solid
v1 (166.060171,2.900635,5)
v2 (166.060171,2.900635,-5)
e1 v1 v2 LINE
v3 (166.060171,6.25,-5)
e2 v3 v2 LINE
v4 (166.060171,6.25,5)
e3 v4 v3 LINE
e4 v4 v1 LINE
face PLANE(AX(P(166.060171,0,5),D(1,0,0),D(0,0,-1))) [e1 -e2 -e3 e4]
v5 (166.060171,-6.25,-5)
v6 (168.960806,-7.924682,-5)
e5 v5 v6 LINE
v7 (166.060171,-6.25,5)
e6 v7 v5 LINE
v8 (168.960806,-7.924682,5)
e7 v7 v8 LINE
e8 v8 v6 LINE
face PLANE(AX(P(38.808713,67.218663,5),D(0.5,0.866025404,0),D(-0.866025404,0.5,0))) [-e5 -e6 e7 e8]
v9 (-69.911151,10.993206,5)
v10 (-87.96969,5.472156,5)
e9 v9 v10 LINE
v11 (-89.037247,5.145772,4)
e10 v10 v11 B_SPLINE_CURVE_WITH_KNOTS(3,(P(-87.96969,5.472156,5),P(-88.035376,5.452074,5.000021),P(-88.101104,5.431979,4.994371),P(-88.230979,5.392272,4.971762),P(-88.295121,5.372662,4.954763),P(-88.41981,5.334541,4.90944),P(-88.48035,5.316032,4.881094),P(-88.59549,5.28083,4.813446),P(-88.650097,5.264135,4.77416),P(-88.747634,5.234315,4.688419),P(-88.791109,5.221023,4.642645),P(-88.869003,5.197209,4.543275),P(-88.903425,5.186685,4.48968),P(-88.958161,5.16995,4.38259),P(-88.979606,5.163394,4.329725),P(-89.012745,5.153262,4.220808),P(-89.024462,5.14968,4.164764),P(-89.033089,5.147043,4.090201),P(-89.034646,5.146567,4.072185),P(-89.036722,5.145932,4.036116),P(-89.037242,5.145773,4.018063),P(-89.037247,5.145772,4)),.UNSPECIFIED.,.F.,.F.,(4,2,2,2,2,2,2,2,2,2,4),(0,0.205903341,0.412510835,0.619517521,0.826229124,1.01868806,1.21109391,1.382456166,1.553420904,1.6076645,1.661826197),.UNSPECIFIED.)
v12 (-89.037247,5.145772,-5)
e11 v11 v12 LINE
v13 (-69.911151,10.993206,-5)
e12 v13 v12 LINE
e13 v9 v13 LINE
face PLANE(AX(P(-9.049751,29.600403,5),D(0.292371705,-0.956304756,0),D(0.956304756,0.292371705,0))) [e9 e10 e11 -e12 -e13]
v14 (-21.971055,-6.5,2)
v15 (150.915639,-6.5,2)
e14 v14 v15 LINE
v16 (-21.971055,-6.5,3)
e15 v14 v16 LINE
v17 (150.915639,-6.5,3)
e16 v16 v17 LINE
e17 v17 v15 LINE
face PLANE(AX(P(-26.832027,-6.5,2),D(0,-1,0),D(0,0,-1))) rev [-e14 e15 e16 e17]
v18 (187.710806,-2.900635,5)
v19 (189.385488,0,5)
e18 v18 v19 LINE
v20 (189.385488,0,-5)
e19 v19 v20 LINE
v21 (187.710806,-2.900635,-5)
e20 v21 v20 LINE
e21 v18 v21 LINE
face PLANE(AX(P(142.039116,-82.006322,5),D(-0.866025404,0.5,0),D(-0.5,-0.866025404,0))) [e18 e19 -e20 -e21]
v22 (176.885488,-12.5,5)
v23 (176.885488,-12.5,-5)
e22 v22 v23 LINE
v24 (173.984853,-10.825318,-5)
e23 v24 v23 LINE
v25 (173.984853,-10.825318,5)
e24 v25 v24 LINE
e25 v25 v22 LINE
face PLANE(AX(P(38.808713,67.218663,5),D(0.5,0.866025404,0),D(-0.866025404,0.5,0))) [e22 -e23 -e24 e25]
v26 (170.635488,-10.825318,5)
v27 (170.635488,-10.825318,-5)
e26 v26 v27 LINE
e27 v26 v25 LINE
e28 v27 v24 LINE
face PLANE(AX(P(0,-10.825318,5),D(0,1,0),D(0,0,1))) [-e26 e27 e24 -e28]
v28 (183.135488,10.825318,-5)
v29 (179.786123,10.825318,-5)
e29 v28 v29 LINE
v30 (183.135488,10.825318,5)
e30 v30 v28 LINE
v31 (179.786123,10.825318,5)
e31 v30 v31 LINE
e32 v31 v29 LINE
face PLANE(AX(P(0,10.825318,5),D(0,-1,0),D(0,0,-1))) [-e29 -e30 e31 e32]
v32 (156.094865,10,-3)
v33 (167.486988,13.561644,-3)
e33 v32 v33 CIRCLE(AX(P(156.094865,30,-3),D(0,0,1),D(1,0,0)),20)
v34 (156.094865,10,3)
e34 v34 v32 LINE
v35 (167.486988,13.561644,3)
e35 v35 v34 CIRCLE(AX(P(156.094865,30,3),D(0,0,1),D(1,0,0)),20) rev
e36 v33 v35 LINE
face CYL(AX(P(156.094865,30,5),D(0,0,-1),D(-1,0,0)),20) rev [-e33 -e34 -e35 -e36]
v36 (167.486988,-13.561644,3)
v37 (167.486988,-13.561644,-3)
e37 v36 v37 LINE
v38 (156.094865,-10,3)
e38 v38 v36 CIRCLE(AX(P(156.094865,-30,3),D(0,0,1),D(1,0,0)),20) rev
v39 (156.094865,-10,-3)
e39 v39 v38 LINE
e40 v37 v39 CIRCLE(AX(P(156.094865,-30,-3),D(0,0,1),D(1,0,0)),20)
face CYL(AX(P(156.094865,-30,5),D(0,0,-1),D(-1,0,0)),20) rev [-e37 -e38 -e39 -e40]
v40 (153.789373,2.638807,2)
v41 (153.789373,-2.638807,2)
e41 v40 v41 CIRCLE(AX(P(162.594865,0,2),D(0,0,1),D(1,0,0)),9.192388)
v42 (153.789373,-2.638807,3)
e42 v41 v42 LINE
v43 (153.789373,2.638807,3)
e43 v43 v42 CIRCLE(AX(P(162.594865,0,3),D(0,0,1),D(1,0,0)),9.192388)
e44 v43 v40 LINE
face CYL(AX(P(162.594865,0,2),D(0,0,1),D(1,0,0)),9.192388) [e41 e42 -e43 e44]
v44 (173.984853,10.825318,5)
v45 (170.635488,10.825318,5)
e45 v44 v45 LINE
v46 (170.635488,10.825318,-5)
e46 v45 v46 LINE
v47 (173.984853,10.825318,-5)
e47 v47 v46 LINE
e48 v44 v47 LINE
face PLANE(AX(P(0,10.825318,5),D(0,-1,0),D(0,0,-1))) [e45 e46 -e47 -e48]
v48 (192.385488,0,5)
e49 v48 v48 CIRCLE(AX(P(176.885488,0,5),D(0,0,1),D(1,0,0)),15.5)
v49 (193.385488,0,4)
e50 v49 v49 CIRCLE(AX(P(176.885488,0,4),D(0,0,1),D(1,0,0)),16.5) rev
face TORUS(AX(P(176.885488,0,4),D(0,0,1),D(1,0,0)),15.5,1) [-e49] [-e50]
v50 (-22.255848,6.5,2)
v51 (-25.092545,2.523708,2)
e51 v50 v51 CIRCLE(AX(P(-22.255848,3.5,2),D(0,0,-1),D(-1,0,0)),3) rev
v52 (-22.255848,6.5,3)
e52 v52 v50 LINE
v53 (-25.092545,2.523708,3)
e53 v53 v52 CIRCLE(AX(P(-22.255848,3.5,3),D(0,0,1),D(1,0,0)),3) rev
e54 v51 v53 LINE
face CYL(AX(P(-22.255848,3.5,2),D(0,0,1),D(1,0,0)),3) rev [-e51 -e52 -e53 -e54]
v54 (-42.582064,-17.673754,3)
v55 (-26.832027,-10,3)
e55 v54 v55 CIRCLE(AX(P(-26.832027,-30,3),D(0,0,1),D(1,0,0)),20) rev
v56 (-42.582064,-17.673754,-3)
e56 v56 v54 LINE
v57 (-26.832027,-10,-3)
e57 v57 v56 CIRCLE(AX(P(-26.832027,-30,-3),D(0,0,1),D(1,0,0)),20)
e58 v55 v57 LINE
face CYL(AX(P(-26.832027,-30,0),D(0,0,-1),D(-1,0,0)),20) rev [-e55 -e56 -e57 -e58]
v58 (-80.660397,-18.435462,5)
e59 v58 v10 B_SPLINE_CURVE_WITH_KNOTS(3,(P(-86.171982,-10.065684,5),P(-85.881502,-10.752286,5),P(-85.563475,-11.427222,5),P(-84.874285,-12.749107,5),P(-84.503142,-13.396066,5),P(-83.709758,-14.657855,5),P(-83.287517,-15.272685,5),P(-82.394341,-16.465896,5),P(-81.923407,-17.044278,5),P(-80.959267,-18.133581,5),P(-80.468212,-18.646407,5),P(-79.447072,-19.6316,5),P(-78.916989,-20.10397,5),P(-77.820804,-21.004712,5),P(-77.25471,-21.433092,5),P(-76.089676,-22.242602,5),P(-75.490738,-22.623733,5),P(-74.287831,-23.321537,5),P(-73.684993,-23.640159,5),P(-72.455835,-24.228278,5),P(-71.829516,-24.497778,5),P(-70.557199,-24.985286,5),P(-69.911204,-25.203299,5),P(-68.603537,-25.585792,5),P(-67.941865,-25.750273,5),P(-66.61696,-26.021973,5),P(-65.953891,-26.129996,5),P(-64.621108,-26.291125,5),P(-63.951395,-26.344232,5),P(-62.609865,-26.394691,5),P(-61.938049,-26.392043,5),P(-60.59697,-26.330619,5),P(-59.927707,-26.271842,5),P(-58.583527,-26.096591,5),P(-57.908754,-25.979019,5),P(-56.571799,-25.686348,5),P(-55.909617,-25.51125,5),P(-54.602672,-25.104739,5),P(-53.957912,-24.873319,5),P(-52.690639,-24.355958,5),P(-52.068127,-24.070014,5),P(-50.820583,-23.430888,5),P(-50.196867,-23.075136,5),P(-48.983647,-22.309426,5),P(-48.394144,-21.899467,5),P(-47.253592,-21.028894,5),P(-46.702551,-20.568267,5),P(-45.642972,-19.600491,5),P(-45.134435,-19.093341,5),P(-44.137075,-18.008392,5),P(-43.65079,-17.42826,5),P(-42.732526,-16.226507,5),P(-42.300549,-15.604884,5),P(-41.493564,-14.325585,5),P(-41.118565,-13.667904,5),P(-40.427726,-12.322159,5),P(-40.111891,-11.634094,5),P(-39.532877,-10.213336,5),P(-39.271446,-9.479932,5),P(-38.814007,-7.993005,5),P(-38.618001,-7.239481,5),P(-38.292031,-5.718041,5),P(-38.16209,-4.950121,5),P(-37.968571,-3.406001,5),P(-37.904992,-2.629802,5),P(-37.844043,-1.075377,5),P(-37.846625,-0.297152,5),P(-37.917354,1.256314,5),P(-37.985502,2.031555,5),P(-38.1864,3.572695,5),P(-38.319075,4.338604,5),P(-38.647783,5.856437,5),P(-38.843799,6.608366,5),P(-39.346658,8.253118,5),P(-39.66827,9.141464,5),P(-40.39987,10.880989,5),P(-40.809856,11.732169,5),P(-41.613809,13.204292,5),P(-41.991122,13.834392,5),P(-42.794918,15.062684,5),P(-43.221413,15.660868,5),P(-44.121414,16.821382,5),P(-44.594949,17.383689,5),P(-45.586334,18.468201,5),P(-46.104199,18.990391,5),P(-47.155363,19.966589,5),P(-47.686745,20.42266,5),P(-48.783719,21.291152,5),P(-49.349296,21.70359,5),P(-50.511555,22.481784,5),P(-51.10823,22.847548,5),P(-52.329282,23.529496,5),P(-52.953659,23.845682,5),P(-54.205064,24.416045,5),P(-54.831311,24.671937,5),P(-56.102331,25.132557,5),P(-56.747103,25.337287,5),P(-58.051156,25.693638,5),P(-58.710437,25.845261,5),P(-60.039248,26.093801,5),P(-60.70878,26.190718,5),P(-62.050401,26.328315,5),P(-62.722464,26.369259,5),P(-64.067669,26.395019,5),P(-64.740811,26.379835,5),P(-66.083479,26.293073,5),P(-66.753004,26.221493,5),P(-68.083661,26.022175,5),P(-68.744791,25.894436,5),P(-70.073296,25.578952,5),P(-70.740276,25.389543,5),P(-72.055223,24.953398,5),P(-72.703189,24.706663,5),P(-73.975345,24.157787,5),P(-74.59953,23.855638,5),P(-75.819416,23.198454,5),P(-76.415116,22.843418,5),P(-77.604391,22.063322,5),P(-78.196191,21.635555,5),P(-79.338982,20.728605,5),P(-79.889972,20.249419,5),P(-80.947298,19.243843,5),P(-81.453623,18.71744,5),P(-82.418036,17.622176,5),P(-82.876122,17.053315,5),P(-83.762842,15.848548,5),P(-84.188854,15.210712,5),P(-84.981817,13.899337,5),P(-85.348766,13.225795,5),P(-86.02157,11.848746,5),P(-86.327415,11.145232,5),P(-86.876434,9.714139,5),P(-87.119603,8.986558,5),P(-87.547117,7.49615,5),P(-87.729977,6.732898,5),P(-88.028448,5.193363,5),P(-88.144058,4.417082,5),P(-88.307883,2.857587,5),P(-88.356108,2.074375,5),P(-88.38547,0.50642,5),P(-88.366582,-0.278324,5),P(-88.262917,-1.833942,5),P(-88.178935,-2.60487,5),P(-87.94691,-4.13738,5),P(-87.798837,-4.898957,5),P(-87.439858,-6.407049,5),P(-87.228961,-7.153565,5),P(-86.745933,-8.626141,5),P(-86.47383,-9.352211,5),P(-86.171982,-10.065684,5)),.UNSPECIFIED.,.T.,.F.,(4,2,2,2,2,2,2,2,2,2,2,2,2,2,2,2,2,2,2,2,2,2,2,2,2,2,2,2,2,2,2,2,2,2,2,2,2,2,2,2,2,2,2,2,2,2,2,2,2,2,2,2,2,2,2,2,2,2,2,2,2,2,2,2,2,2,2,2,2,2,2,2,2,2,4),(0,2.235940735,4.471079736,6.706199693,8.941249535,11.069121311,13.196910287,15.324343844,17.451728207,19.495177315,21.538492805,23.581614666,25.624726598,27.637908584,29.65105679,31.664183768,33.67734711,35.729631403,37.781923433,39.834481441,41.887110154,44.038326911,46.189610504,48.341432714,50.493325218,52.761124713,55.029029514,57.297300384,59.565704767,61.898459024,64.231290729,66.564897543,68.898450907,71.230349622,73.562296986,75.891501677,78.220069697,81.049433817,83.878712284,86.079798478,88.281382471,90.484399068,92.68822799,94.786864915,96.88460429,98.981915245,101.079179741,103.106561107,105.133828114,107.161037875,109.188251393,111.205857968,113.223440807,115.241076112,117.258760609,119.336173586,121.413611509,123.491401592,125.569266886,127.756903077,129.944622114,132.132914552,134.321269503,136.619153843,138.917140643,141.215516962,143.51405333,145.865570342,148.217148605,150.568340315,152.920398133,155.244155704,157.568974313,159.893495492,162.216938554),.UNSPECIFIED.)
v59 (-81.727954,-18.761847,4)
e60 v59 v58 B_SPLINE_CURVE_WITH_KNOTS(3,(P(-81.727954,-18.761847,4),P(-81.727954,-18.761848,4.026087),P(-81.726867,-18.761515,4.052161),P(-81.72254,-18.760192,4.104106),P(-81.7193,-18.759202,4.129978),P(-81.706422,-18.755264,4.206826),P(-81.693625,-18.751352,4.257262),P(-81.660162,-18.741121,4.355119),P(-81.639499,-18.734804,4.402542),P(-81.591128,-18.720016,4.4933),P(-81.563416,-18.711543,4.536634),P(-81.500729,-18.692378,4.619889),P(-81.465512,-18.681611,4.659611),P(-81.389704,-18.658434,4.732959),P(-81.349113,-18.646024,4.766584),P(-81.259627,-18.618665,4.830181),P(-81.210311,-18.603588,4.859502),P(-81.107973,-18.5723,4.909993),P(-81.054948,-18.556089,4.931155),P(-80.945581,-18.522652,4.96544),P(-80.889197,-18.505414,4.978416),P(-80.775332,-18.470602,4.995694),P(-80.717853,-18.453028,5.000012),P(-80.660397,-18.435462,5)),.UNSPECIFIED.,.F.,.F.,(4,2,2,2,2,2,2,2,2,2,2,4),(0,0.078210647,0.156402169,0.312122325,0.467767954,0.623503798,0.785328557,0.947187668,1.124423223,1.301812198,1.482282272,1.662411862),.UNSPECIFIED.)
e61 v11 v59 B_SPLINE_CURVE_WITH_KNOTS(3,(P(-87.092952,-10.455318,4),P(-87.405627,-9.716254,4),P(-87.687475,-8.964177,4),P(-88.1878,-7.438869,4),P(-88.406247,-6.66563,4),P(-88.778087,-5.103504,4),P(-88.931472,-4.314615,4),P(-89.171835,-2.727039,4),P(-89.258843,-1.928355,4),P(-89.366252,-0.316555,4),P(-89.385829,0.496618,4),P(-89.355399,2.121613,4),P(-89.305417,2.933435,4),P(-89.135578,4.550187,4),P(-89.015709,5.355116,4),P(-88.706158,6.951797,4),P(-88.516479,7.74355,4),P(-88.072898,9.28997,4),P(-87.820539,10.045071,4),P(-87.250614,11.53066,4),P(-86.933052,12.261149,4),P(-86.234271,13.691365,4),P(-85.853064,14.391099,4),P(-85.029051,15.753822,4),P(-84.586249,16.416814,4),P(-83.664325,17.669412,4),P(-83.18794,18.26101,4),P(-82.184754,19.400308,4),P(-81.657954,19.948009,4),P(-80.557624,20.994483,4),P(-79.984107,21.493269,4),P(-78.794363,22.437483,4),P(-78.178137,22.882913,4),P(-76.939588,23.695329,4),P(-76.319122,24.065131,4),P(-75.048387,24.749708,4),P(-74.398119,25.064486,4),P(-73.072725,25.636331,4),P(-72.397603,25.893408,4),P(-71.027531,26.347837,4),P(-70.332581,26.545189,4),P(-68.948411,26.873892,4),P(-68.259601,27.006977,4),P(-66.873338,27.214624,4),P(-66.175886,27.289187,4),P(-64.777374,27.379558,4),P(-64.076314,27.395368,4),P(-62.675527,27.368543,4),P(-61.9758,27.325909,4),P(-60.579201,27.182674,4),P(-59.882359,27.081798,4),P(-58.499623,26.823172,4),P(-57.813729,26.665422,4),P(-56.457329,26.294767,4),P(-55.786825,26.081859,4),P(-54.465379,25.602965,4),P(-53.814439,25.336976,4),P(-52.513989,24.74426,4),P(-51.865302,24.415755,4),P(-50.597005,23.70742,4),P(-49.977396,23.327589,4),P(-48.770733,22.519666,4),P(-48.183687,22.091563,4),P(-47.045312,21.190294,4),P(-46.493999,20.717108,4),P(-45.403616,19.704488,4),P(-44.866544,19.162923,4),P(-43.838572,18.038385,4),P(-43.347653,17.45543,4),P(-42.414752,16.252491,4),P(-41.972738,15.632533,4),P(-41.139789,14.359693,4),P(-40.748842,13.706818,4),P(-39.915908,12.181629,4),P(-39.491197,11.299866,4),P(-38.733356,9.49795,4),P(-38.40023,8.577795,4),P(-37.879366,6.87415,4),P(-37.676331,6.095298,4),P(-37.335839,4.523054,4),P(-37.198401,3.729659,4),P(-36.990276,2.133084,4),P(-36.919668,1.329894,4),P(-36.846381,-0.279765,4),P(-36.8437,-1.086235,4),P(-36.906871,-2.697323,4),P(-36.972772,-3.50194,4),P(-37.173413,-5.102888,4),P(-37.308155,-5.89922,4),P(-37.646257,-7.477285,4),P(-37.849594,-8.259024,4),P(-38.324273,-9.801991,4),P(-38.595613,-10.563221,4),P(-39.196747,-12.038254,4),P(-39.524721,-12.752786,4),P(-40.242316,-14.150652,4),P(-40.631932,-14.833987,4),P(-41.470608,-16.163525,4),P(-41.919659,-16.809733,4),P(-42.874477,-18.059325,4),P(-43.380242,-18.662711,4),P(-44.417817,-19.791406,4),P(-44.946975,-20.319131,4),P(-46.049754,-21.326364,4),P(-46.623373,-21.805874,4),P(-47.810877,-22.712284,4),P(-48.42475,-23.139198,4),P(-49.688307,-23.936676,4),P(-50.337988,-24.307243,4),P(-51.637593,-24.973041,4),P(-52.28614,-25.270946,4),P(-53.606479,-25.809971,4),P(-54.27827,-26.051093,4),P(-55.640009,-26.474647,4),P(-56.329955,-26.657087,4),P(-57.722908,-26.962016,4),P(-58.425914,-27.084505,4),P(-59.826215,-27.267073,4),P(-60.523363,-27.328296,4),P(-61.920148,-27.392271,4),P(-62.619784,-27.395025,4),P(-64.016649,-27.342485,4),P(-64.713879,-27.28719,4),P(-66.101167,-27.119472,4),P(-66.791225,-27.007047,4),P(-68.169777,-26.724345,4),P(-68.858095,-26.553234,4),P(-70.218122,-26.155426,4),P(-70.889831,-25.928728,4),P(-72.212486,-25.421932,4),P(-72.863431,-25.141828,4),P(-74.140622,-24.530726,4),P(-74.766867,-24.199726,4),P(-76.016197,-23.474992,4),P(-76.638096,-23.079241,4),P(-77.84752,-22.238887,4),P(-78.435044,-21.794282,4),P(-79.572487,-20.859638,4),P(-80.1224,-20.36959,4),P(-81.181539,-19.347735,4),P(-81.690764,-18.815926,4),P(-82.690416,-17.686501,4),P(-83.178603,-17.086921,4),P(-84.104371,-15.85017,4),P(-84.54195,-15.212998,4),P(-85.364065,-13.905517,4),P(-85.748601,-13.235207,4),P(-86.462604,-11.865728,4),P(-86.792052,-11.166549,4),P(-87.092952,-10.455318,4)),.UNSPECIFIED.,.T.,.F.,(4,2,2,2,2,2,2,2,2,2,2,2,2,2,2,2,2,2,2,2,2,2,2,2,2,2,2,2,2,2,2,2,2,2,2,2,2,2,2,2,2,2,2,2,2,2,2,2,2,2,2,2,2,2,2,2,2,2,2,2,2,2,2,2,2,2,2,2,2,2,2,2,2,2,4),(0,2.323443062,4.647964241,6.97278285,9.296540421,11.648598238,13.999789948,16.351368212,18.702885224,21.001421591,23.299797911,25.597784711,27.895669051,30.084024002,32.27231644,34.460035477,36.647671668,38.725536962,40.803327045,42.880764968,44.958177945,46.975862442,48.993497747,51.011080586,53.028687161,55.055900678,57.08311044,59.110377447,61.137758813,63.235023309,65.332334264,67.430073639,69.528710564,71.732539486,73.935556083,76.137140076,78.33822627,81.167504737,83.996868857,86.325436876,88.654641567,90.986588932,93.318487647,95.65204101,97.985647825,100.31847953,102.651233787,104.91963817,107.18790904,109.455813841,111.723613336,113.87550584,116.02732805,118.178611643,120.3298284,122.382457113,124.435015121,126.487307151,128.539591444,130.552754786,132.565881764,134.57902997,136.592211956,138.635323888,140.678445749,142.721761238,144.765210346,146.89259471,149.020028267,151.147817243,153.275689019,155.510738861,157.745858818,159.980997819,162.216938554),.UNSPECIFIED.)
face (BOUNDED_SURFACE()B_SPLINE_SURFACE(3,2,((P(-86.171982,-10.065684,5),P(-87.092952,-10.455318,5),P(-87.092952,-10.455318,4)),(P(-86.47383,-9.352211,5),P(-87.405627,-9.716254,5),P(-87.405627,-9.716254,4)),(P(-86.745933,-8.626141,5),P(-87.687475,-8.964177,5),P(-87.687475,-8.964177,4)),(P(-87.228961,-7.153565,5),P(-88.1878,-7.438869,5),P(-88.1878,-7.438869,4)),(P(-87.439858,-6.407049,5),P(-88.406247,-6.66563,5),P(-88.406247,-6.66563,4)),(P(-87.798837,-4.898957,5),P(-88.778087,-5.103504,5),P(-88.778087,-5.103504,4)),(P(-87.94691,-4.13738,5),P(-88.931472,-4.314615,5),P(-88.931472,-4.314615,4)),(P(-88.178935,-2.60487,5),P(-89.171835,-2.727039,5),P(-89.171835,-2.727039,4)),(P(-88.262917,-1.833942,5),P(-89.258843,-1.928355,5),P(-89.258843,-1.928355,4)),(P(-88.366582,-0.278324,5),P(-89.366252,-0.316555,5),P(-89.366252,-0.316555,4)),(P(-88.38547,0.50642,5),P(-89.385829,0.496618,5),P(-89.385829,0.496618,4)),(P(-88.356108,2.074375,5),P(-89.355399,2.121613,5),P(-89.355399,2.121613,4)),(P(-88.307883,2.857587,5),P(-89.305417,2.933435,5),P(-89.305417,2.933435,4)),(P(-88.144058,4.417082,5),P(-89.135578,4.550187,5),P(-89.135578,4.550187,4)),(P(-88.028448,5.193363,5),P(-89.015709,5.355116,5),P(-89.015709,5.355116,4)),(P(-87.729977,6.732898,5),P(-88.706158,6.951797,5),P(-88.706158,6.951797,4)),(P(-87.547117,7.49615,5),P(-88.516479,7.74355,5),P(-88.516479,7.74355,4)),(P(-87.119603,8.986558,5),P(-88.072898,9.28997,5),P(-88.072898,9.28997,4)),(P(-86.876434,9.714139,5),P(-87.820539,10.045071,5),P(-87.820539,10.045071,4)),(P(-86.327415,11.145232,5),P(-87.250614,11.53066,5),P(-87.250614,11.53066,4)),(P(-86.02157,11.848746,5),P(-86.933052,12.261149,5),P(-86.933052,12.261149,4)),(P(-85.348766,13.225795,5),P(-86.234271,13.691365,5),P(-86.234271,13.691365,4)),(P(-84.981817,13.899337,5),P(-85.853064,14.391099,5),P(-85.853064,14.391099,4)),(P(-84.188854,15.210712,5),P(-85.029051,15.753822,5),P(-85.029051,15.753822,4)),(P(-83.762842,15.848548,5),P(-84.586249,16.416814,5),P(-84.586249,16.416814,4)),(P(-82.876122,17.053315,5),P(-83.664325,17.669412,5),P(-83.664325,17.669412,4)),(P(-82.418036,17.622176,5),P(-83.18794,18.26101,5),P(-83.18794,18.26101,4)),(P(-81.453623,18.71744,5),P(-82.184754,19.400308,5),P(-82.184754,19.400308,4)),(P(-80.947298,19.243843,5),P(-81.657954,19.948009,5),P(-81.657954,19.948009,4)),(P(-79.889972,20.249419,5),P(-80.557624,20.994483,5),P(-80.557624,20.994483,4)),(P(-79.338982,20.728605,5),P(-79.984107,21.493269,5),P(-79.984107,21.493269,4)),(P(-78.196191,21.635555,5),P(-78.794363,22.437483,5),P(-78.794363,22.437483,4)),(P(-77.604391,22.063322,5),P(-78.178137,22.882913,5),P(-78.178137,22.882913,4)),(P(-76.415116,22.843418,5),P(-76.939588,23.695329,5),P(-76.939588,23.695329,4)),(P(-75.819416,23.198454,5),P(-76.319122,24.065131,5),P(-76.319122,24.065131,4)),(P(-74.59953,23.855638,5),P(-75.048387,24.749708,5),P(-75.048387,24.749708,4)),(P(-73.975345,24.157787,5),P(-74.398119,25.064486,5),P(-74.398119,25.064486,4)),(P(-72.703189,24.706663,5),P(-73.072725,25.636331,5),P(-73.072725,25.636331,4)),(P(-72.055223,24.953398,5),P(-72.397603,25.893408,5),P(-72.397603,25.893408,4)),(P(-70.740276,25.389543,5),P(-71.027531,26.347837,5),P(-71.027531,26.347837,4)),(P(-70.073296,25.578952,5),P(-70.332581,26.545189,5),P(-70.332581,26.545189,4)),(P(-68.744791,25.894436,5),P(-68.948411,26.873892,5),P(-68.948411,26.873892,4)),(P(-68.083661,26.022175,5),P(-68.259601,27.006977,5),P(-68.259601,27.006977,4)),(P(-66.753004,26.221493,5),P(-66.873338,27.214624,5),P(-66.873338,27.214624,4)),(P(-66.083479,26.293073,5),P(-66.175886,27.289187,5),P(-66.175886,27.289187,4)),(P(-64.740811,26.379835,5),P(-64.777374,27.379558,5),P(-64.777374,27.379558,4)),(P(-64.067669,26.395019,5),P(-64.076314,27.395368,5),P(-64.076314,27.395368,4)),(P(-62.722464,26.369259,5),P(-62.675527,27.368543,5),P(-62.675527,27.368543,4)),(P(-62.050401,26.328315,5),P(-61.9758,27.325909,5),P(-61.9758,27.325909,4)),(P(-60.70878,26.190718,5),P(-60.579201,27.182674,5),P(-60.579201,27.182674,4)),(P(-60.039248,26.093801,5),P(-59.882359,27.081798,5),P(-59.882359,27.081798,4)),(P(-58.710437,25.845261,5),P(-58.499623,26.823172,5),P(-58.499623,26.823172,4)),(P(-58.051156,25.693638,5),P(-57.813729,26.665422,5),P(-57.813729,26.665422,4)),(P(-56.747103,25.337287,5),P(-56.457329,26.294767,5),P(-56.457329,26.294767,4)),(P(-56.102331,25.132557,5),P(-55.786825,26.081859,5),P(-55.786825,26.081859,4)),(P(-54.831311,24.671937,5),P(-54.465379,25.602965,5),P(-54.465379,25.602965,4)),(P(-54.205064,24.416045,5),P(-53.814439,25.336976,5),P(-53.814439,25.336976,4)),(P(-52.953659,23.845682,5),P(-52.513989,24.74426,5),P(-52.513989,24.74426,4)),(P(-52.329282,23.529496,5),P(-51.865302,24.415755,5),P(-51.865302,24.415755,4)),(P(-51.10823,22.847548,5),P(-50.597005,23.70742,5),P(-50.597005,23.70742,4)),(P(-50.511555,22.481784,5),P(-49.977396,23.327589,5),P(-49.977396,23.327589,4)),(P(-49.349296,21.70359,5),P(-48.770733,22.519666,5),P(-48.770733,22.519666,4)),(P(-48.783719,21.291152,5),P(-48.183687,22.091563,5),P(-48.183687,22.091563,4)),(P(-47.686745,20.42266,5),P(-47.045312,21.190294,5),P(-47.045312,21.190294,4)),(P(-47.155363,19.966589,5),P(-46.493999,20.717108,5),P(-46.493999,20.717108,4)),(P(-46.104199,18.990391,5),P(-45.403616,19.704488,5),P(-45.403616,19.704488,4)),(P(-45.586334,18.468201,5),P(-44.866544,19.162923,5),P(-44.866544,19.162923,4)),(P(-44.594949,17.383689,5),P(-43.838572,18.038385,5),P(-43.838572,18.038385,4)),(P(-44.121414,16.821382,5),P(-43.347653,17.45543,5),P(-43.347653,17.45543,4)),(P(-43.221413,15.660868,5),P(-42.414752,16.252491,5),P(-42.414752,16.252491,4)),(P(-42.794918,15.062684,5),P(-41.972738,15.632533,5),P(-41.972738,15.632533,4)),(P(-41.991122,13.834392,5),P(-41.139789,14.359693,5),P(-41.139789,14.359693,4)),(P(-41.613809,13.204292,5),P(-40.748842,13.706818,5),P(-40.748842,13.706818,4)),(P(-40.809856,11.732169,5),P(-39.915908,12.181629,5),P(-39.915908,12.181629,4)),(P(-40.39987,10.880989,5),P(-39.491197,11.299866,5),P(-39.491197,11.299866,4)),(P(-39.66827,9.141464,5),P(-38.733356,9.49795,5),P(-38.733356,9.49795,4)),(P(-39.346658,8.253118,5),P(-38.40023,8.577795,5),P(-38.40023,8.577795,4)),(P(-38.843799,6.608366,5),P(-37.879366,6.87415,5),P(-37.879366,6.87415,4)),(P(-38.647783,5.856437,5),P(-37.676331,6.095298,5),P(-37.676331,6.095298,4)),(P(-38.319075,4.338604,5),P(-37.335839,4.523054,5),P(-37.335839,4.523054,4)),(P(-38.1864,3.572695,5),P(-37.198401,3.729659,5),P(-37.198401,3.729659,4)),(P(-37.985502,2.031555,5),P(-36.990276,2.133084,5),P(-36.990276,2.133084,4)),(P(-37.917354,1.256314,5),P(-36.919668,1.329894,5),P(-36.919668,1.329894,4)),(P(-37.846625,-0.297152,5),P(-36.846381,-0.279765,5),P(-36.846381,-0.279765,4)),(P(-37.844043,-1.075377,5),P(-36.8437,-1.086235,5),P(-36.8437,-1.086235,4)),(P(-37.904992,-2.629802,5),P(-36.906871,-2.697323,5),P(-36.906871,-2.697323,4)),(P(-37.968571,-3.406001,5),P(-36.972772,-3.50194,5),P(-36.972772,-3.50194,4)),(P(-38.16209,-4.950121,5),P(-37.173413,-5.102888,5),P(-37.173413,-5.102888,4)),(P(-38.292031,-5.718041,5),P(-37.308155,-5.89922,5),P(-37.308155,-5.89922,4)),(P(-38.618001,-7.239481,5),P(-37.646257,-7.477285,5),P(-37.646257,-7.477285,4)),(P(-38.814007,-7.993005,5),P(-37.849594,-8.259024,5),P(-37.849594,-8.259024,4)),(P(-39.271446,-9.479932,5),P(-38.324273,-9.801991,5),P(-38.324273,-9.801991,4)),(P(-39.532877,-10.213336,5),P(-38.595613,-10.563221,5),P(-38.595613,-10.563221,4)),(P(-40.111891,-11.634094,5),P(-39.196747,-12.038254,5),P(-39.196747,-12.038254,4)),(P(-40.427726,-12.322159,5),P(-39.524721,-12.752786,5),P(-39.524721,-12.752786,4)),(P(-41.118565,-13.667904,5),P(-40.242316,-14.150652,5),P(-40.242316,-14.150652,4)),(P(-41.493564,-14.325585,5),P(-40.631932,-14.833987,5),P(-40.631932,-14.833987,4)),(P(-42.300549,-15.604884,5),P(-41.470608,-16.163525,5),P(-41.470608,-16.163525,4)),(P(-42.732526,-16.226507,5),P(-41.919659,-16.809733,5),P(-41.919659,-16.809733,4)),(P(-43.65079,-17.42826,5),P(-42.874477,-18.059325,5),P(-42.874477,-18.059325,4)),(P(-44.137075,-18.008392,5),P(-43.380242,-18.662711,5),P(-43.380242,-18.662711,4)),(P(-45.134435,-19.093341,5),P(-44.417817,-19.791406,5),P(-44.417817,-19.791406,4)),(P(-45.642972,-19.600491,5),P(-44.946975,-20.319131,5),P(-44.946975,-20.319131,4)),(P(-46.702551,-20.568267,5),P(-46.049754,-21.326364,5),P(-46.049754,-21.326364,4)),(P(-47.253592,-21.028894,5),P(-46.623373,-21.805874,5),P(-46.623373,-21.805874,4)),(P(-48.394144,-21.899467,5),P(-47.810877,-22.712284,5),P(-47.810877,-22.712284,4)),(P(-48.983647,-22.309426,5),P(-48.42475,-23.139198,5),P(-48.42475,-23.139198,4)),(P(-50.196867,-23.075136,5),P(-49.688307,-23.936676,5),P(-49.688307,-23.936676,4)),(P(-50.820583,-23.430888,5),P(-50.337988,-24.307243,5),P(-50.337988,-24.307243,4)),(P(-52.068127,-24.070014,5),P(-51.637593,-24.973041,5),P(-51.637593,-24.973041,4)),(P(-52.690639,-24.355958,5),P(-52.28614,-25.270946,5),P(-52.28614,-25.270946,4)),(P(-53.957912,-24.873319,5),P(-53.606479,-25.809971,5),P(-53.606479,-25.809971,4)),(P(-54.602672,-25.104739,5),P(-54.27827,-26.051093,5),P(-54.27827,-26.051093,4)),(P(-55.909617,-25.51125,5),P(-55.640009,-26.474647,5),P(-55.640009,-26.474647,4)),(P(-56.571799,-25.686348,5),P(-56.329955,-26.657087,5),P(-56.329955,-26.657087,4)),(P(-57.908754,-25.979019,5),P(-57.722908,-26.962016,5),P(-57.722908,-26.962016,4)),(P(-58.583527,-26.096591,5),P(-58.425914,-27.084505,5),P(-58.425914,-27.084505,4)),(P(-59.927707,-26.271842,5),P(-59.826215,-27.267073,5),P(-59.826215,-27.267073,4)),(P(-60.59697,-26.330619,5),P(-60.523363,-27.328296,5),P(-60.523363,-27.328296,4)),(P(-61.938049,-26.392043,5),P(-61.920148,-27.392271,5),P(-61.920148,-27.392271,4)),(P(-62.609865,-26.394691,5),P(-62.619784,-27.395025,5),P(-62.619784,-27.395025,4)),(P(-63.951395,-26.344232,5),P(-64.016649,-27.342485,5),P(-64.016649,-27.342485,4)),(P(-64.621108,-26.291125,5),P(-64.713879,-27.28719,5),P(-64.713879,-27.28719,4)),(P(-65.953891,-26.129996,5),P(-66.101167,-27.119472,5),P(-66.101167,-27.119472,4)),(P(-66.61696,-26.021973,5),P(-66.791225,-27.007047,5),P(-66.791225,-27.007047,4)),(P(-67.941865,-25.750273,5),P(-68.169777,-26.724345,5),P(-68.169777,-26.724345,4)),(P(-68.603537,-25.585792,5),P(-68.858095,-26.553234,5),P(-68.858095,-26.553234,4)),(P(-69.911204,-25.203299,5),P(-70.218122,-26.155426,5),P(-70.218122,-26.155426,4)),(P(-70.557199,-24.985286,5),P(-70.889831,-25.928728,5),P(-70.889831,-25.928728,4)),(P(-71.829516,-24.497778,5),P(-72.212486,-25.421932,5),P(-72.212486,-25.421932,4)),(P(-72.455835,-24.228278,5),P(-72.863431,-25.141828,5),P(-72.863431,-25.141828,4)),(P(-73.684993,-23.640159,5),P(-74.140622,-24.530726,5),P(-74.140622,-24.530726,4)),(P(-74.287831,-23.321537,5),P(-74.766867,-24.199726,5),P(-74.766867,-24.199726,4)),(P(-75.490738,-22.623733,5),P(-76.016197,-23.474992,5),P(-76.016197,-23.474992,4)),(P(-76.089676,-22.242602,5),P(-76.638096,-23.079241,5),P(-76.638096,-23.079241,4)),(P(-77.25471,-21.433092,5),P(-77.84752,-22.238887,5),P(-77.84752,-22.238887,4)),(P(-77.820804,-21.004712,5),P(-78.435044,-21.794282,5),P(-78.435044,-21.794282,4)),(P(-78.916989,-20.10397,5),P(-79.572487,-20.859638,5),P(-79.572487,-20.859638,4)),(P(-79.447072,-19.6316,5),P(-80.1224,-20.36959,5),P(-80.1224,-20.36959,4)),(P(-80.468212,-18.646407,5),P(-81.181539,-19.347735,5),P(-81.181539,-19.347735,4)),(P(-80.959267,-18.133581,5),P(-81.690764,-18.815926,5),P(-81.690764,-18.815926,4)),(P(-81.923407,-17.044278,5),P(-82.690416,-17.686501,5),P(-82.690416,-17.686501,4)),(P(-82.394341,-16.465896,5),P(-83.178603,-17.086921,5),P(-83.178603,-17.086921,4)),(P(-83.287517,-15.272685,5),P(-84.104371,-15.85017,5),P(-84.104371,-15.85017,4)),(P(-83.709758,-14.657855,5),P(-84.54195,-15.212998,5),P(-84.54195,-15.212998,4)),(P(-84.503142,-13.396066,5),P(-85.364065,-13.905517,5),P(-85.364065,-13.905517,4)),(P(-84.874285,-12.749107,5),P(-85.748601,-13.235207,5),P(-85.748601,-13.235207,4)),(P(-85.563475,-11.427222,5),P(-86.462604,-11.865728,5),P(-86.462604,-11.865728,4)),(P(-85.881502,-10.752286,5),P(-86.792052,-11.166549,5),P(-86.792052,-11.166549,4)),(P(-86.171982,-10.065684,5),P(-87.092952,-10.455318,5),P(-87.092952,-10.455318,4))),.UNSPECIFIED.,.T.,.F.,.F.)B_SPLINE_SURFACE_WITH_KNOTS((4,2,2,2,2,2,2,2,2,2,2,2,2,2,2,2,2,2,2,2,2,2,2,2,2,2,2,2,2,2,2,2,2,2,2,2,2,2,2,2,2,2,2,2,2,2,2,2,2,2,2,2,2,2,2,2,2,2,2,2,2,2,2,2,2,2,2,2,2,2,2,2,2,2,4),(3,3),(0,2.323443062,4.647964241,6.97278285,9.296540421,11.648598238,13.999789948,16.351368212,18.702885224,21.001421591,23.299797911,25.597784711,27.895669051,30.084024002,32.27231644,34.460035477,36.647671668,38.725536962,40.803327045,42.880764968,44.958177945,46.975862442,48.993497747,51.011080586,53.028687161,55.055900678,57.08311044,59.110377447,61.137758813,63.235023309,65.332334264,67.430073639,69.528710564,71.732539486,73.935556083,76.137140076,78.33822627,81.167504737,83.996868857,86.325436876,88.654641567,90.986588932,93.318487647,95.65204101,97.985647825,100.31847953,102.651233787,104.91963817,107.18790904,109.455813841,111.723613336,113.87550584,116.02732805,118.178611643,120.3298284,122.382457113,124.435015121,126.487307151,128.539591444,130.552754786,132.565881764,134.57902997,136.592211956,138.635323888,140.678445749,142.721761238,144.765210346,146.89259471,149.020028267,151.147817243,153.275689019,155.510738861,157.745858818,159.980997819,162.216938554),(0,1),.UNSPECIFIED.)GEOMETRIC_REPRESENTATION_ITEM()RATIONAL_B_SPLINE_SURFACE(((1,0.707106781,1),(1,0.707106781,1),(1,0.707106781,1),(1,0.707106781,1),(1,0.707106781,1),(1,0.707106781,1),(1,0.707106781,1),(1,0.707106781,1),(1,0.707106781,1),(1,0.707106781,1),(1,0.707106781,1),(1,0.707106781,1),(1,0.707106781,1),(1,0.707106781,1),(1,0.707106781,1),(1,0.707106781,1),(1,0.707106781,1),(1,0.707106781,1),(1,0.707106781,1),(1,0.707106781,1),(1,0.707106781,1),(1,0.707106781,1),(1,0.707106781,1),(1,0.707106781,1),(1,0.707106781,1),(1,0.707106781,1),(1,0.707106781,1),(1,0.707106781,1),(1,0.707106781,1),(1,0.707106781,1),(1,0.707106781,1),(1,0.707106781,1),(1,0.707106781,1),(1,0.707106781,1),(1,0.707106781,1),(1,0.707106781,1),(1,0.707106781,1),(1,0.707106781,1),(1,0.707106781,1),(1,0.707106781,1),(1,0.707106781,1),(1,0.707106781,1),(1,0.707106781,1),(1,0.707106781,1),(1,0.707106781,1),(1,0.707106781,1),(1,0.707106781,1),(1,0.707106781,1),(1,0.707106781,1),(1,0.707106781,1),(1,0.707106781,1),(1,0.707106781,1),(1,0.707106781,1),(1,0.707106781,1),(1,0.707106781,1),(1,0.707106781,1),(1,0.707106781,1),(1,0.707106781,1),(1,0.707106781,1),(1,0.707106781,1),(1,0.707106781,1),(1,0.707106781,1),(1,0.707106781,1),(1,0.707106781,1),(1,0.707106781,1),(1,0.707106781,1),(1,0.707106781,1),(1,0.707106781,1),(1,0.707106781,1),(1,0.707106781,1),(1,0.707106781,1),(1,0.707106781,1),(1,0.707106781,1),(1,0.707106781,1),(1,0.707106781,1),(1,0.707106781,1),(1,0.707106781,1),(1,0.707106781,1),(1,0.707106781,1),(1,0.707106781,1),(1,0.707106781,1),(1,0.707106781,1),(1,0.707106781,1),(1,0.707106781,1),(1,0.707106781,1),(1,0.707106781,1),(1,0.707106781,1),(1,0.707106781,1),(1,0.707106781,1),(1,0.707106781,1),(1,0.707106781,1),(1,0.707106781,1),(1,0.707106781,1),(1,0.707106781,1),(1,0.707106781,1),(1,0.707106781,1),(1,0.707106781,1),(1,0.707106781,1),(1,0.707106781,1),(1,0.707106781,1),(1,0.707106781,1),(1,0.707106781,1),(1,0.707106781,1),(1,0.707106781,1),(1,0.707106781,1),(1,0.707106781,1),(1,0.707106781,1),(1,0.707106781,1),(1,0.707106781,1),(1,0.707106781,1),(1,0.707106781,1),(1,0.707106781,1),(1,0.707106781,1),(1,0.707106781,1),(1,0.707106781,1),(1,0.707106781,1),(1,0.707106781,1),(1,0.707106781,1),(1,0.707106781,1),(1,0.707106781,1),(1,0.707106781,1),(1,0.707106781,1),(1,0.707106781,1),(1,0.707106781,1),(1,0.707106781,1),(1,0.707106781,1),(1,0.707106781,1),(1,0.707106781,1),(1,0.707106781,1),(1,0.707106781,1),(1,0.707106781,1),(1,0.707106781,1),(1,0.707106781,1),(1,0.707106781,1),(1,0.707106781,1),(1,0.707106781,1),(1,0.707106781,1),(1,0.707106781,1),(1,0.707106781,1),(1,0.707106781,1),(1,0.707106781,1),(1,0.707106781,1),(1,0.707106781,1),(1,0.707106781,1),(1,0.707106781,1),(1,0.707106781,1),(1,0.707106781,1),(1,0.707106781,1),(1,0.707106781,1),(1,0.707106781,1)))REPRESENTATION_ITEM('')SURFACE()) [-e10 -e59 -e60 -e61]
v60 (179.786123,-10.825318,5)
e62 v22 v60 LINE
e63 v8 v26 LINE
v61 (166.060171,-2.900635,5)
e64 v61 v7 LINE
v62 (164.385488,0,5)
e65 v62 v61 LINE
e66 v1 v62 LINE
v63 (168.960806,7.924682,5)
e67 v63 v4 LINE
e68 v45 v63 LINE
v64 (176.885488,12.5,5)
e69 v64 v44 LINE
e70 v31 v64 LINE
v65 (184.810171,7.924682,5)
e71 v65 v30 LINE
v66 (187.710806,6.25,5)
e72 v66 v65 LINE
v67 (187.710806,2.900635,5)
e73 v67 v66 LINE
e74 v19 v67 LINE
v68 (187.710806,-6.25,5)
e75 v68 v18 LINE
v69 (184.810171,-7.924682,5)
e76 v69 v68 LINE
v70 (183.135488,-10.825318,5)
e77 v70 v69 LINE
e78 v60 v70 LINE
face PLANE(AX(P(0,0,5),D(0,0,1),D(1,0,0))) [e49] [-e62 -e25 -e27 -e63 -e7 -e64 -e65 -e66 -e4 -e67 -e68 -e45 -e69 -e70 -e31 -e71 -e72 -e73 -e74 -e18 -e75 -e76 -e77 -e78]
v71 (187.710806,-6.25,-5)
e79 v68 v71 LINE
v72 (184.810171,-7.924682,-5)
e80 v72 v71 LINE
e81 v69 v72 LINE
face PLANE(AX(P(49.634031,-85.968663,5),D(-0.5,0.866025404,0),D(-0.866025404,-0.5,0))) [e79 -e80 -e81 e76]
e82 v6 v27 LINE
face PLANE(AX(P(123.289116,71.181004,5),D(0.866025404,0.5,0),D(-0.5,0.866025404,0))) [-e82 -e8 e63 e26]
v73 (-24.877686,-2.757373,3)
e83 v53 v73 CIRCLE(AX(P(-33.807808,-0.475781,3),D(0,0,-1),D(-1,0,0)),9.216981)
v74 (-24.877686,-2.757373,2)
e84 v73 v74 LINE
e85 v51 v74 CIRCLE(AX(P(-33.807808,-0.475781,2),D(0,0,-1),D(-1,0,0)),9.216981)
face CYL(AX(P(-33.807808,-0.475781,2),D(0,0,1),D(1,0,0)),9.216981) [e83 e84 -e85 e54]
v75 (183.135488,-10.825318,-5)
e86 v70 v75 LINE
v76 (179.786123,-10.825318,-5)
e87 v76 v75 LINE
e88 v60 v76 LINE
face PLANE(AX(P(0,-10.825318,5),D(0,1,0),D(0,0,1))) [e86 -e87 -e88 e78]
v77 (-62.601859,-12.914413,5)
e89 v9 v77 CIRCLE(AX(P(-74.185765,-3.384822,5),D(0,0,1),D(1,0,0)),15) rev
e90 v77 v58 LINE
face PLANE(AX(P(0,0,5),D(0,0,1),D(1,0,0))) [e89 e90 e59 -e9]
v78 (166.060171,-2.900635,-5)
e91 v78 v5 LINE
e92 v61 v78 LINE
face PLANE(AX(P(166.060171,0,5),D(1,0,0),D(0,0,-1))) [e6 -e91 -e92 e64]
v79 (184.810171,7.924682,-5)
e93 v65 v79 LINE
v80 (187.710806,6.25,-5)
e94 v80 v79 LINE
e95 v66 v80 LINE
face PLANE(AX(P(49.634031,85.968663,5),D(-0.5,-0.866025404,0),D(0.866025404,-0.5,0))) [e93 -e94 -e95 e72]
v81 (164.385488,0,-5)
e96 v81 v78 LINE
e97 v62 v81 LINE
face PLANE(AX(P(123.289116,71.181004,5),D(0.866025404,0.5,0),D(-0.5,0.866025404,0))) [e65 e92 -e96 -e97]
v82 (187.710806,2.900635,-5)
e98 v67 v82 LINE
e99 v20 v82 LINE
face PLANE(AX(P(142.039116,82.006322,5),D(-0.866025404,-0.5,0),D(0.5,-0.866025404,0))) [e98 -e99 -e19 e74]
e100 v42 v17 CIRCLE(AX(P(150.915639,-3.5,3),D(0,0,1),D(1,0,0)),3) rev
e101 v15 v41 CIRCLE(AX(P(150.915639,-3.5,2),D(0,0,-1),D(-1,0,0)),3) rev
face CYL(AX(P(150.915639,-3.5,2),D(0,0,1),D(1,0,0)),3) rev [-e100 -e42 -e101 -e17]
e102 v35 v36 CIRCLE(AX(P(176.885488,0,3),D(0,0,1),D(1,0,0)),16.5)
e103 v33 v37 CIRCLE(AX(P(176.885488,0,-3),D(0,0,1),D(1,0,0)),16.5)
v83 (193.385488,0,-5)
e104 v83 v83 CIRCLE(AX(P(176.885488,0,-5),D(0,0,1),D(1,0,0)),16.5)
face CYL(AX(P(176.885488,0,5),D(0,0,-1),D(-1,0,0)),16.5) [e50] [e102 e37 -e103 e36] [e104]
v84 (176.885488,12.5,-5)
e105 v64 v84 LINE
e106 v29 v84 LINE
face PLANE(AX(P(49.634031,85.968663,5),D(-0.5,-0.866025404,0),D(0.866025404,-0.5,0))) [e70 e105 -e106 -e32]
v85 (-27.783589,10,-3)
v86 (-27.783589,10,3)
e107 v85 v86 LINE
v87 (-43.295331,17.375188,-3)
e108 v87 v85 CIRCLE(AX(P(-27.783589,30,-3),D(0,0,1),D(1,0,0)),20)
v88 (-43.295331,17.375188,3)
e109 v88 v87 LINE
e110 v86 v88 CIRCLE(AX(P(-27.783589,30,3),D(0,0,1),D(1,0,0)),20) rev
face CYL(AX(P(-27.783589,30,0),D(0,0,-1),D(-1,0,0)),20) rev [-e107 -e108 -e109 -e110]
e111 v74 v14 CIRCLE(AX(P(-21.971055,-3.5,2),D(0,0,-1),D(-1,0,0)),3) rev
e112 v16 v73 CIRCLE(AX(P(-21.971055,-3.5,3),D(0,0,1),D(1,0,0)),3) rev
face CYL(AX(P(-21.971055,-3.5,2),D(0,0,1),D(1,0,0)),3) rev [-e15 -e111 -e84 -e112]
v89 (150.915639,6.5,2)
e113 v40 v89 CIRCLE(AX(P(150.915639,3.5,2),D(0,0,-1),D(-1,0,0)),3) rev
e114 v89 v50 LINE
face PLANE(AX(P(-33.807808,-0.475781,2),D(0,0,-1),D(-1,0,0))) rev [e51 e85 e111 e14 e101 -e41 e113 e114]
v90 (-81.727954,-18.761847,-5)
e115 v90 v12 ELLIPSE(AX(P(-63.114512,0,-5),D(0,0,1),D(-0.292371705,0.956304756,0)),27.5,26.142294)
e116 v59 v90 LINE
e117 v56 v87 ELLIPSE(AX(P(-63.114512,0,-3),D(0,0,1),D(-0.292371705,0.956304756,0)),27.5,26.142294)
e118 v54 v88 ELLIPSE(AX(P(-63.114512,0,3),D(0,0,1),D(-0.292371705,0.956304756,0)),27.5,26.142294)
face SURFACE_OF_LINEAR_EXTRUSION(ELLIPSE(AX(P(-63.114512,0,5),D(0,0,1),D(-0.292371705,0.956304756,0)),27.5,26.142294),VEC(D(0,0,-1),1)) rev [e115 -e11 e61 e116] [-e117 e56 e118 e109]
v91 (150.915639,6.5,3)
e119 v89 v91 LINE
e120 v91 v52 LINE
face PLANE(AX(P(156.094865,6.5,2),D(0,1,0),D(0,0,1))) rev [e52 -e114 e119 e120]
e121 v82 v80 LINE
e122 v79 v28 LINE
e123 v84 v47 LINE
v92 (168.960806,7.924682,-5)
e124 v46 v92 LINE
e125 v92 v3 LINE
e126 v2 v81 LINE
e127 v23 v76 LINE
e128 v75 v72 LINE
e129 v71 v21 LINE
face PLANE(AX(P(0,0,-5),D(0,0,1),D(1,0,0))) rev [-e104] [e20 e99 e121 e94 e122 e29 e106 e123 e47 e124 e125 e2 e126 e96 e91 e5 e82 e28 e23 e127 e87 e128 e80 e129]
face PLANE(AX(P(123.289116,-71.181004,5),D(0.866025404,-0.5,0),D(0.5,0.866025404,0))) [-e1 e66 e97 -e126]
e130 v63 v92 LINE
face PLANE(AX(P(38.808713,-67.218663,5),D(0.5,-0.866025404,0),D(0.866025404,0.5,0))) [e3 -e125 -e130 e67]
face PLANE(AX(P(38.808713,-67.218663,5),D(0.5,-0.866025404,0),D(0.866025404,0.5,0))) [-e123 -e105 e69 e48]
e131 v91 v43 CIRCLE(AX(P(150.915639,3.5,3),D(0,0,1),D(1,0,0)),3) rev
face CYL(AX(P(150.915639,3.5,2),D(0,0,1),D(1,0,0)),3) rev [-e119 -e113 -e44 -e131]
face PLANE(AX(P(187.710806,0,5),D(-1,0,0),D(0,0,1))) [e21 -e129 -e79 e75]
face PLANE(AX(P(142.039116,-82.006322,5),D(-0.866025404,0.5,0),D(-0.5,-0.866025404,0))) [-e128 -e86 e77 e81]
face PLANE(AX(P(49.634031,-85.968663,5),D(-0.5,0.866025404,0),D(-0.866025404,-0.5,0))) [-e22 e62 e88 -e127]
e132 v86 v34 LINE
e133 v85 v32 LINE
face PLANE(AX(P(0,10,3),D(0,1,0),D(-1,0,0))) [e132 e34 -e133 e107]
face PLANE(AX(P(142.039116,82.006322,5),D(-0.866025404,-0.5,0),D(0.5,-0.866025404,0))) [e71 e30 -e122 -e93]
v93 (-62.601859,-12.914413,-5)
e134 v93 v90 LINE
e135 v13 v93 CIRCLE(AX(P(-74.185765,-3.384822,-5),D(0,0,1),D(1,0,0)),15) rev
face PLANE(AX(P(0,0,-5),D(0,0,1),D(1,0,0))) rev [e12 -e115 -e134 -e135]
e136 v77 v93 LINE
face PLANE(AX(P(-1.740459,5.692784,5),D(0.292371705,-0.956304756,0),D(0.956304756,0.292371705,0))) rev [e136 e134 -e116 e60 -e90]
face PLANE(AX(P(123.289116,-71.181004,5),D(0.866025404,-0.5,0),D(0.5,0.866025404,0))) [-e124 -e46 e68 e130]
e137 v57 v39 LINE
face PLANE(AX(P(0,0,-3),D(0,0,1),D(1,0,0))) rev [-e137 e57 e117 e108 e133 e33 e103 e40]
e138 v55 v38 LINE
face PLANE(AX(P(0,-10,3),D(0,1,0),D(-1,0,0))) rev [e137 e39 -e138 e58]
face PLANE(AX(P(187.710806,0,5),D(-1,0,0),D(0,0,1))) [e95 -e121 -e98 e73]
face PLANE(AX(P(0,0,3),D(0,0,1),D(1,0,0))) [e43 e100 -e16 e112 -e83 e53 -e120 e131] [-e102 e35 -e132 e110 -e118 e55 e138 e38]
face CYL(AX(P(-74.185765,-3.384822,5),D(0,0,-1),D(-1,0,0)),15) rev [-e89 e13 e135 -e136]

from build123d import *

# Parameters (mm, degrees)
BOSS_EXTRUDE1_DEPTH   = 5
BOSS_EXTRUDE1_2_DEPTH = 5
BOSS_EXTRUDE2_DEPTH   = 3
FILLET1_R             = 20
FILLET2_R             = 20
CUT_EXTRUDE2_DEPTH    = 1
FILLET3_R             = 3
FILLET4_R             = 1


with BuildPart() as part:
    # Sketch1 → Boss-Extrude1 (new, symmetric)
    with BuildSketch(Plane.XY):
        with BuildLine():
            Line((-89.037246537, 5.145771556), (-69.911151418, 10.99320565))
            ThreePointArc((-69.911151418, 10.99320565), (-59.841193921, 1.000753662), (-62.6018588, -12.914413249))
            Line((-62.6018588, -12.914413249), (-81.727953919, -18.761847343))
            add(Edge.make_bspline(
                [(-81.727953919, -18.761847343), (-58.860884109, -43.388050907), (-41.130092768, -15.622946309), (-39.447011057, -12.987365142), (-38.405002213, -10)],
                knots=[2.042658164, 2.042658164, 2.042658164, 3.822478708, 3.822478708, 4.076668665, 4.076668665, 4.076668665], degree=2, weights=[1, 0.629481749, 1, 0.947083419, 0.909281691]))
            add(Edge.make_bspline(
                [(-38.405002213, -10), (-34.916949048, 0), (-38.94800166, 10)],
                knots=[4.076668665, 4.076668665, 4.076668665, 4.797306531, 4.797306531, 4.797306531], degree=2, weights=[0.909281691, 0.802112405, 0.816427746]))
            add(Edge.make_bspline(
                [(-38.94800166, 10), (-43.286972227, 20.763864888), (-53.624843095, 25.245540515), (-83.850384762, 38.348922741), (-89.037246537, 5.145771556)],
                knots=[4.797306531, 4.797306531, 4.797306531, 5.602299252, 5.602299252, 7.382119797, 7.382119797, 7.382119797], degree=2, weights=[0.816427746, 0.832418782, 1, 0.629481749, 1]))
        make_face()
    extrude(amount=BOSS_EXTRUDE1_DEPTH, both=True)



with BuildPart() as body_2:
    # Sketch1 → Boss-Extrude1 2 (new, symmetric)
    with BuildSketch(Plane.XY):
        with BuildLine():
            ThreePointArc((193.385488342, 0), (182.162671381, 15.633340627), (163.761083594, 10))
            ThreePointArc((163.761083594, 10), (160.385488342, 0), (163.761083594, -10))
            ThreePointArc((163.761083594, -10), (182.162671381, -15.633340627), (193.385488342, 0))
        make_face()
        Polygon((170.635488342, 10.825317547), (173.984853248, 10.825317547), (176.885488342, 12.5), (179.786123437, 10.825317547), (183.135488342, 10.825317547), (184.810170795, 7.924682453), (187.71080589, 6.25), (187.71080589, 2.900635095), (189.385488342, 0), (187.71080589, -2.900635095), (187.71080589, -6.25), (184.810170795, -7.924682453), (183.135488342, -10.825317547), (179.786123437, -10.825317547), (176.885488342, -12.5), (173.984853248, -10.825317547), (170.635488342, -10.825317547), (168.96080589, -7.924682453), (166.060170795, -6.25), (166.060170795, -2.900635095), (164.385488342, 0), (166.060170795, 2.900635095), (166.060170795, 6.25), (168.96080589, 7.924682453), align=None, mode=Mode.SUBTRACT)
    extrude(amount=BOSS_EXTRUDE1_2_DEPTH, both=True)


with BuildPart() as part_1:
    add(part.part)

    add(body_2.part)  # Boss-Extrude2 merges body 2
    # Sketch1<4> → Boss-Extrude2 (add, symmetric)
    with BuildSketch(Plane.XY):
        with BuildLine():
            Line((163.761083594, 10), (-38.94800166, 10))
            add(Edge.make_bspline(
                [(-38.405002213, -10), (-34.916949048, 0), (-38.94800166, 10)],
                knots=[4.076668665, 4.076668665, 4.076668665, 4.797306531, 4.797306531, 4.797306531], degree=2, weights=[0.909281691, 0.802112405, 0.816427746]))
            Line((-38.405002213, -10), (163.761083594, -10))
            ThreePointArc((163.761083594, -10), (160.385488342, 0), (163.761083594, 10))
        make_face()
    extrude(amount=BOSS_EXTRUDE2_DEPTH, both=True)

    # Fillet1
    # the kernel refuses this fillet: 20 mm, written as the material it adds along each edge
    with BuildSketch(Plane(origin=(-38.94800166, 10, 0), x_dir=(-0.507799469280601, 0.8614753037657783, 0), z_dir=(0, 0, -1))) as fillet1_piece_1:
        with BuildLine():
            CenterArc((11.560223387, 19.773854944), FILLET1_R, 210.517364345, 50.858287997)
            Line((-5.669282689, 9.617865559), (-6.01387281, 9.414745771))
            Line((-6.01387281, 9.414745771), (-0.344590122, -0.203119788))
            Line((-0.344590122, -0.203119788), (0.059556935, -0.395541365))
            ThreePointArc((0.059556935, -0.395541365), (4.280578149, -0.078560147), (8.501131211, -0.395477099))
            Line((8.501131211, -0.395477099), (8.561113411, 0))
        make_face()
    fillet1_piece_1_solid = extrude(amount=3, mode=Mode.PRIVATE)
    with BuildSketch(Plane(origin=(-38.405002213, -10, 0), x_dir=(-0.4780913374533499, -0.8783101235053977, 0), z_dir=(0, 0, 1))) as fillet1_piece_2:
        with BuildLine():
            CenterArc((12.033263145, 19.726488271), FILLET1_R, 208.560818285, 51.952664674)
            Line((-5.532939325, 10.164661522), (-5.884263374, 9.973424987))
            Line((-5.884263374, 9.973424987), (-0.351324049, -0.191236535))
            Line((-0.351324049, -0.191236535), (0.064860434, -0.394706377))
            ThreePointArc((0.064860434, -0.394706377), (4.368504422, -0.040514317), (8.671026811, -0.394529765))
            Line((8.671026811, -0.394529765), (8.736953014, 0))
        make_face()
    fillet1_piece_2_solid = extrude(amount=3, mode=Mode.PRIVATE)
    with BuildSketch(Plane(origin=(-38.405002213, -10, 0), x_dir=(-0.4780913374533499, -0.8783101235053977, 0), z_dir=(0, 0, -1))) as fillet1_piece_3:
        with BuildLine():
            CenterArc((12.033263145, -19.726488271), FILLET1_R, 99.486517041, 51.952664674)
            Line((-5.532939325, -10.164661522), (-5.884263374, -9.973424987))
            Line((-5.884263374, -9.973424987), (-0.351324049, 0.191236535))
            Line((-0.351324049, 0.191236535), (0.064860434, 0.394706377))
            ThreePointArc((0.064860434, 0.394706377), (4.368504422, 0.040514317), (8.671026811, 0.394529765))
            Line((8.671026811, 0.394529765), (8.736953014, 0))
        make_face()
    fillet1_piece_3_solid = extrude(amount=3, mode=Mode.PRIVATE)
    with BuildSketch(Plane(origin=(-38.94800166, 10, 0), x_dir=(-0.507799469280601, 0.8614753037657783, 0), z_dir=(0, 0, 1))) as fillet1_piece_4:
        with BuildLine():
            CenterArc((11.560223387, -19.773854944), FILLET1_R, 98.624347659, 50.858287997)
            Line((-5.669282689, -9.617865559), (-6.01387281, -9.414745771))
            Line((-6.01387281, -9.414745771), (-0.344590122, 0.203119788))
            Line((-0.344590122, 0.203119788), (0.059556935, 0.395541365))
            ThreePointArc((0.059556935, 0.395541365), (4.280578149, 0.078560147), (8.501131211, 0.395477099))
            Line((8.501131211, 0.395477099), (8.561113411, 0))
        make_face()
    fillet1_piece_4_solid = extrude(amount=3, mode=Mode.PRIVATE)
    add([fillet1_piece_1_solid, fillet1_piece_2_solid, fillet1_piece_3_solid, fillet1_piece_4_solid])

    # Fillet2
    # the kernel refuses this fillet: 20 mm, written as the material it adds along each edge
    with BuildSketch(Plane(origin=(163.761083594, -10, 0), x_dir=(0.7228612548390331, -0.6909932027542227, 0), z_dir=(0, 0, -1))) as fillet2_piece_1:
        with BuildLine():
            CenterArc((8.278251992, 19.754529721), FILLET2_R, 226.291219019, 34.722762927)
            Line((-5.541612063, 5.297304624), (0, 0))
            ThreePointArc((0, 0), (2.577191658, 0.20251298), (5.154383316, 0))
        make_face()
    extrude(amount=3)
    with BuildSketch(Plane(origin=(163.761083594, 10, 0), x_dir=(-1, 0, 0), z_dir=(0, 0, -1)), Plane(origin=(163.761083594, -10, 0), x_dir=(-1, 0, 0), z_dir=(0, 0, 1))) as fillet2_piece_2:
        with BuildLine():
            CenterArc((7.666218138, 20), FILLET2_R, 235.277237073, 34.722762927)
            ThreePointArc((-3.725903992, 3.561643836), (-1.723016903, 1.927210705), (0, 0))
            Line((0, 0), (7.666218138, 0))
        make_face()
    extrude(amount=3)
    with BuildSketch(Plane(origin=(163.761083594, 10, 0), x_dir=(-1, 0, 0), z_dir=(0, 0, 1))) as fillet2_piece_3:
        with BuildLine():
            CenterArc((7.666218138, -20), FILLET2_R, 90, 34.722762927)
            ThreePointArc((-3.725903992, -3.561643836), (-1.723016903, -1.927210705), (0, 0))
            Line((0, 0), (7.666218138, 0))
        make_face()
    extrude(amount=3)

    # Sketch4 → Cut-Extrude2 (cut)
    with BuildSketch(Plane.XY.offset(3)):
        with BuildLine():
            Line((156.094865456, 6.5), (-27.783589266, 6.5))
            ThreePointArc((-27.783589266, 6.5), (-24.615419845, 0.197075053), (-26.832026734, -6.5))
            Line((-26.832026734, -6.5), (156.094865456, -6.5))
            ThreePointArc((156.094865456, -6.5), (153.402477301, 0), (156.094865456, 6.5))
        make_face()
    extrude(amount=-CUT_EXTRUDE2_DEPTH, mode=Mode.SUBTRACT)

    # Fillet3
    fillet3_edges = [part_1.edges().sort_by_distance(p)[0] for p in [
        (-27.783589266, 6.5, 2.5),
        (156.094865456, 6.5, 2.5),
        (156.094865456, -6.5, 2.5),
        (-26.832026734, -6.5, 2.5),
    ]]
    fillet(fillet3_edges, radius=FILLET3_R)

    # Fillet4
    fillet4_edges = [part_1.edges().sort_by_distance(p)[0] for p in [
        (-36.865276066, 0.047607181, 5),
        (182.162671381, 15.633340627, 5),
    ]]
    fillet(fillet4_edges, radius=FILLET4_R)


solid = part_1.part
